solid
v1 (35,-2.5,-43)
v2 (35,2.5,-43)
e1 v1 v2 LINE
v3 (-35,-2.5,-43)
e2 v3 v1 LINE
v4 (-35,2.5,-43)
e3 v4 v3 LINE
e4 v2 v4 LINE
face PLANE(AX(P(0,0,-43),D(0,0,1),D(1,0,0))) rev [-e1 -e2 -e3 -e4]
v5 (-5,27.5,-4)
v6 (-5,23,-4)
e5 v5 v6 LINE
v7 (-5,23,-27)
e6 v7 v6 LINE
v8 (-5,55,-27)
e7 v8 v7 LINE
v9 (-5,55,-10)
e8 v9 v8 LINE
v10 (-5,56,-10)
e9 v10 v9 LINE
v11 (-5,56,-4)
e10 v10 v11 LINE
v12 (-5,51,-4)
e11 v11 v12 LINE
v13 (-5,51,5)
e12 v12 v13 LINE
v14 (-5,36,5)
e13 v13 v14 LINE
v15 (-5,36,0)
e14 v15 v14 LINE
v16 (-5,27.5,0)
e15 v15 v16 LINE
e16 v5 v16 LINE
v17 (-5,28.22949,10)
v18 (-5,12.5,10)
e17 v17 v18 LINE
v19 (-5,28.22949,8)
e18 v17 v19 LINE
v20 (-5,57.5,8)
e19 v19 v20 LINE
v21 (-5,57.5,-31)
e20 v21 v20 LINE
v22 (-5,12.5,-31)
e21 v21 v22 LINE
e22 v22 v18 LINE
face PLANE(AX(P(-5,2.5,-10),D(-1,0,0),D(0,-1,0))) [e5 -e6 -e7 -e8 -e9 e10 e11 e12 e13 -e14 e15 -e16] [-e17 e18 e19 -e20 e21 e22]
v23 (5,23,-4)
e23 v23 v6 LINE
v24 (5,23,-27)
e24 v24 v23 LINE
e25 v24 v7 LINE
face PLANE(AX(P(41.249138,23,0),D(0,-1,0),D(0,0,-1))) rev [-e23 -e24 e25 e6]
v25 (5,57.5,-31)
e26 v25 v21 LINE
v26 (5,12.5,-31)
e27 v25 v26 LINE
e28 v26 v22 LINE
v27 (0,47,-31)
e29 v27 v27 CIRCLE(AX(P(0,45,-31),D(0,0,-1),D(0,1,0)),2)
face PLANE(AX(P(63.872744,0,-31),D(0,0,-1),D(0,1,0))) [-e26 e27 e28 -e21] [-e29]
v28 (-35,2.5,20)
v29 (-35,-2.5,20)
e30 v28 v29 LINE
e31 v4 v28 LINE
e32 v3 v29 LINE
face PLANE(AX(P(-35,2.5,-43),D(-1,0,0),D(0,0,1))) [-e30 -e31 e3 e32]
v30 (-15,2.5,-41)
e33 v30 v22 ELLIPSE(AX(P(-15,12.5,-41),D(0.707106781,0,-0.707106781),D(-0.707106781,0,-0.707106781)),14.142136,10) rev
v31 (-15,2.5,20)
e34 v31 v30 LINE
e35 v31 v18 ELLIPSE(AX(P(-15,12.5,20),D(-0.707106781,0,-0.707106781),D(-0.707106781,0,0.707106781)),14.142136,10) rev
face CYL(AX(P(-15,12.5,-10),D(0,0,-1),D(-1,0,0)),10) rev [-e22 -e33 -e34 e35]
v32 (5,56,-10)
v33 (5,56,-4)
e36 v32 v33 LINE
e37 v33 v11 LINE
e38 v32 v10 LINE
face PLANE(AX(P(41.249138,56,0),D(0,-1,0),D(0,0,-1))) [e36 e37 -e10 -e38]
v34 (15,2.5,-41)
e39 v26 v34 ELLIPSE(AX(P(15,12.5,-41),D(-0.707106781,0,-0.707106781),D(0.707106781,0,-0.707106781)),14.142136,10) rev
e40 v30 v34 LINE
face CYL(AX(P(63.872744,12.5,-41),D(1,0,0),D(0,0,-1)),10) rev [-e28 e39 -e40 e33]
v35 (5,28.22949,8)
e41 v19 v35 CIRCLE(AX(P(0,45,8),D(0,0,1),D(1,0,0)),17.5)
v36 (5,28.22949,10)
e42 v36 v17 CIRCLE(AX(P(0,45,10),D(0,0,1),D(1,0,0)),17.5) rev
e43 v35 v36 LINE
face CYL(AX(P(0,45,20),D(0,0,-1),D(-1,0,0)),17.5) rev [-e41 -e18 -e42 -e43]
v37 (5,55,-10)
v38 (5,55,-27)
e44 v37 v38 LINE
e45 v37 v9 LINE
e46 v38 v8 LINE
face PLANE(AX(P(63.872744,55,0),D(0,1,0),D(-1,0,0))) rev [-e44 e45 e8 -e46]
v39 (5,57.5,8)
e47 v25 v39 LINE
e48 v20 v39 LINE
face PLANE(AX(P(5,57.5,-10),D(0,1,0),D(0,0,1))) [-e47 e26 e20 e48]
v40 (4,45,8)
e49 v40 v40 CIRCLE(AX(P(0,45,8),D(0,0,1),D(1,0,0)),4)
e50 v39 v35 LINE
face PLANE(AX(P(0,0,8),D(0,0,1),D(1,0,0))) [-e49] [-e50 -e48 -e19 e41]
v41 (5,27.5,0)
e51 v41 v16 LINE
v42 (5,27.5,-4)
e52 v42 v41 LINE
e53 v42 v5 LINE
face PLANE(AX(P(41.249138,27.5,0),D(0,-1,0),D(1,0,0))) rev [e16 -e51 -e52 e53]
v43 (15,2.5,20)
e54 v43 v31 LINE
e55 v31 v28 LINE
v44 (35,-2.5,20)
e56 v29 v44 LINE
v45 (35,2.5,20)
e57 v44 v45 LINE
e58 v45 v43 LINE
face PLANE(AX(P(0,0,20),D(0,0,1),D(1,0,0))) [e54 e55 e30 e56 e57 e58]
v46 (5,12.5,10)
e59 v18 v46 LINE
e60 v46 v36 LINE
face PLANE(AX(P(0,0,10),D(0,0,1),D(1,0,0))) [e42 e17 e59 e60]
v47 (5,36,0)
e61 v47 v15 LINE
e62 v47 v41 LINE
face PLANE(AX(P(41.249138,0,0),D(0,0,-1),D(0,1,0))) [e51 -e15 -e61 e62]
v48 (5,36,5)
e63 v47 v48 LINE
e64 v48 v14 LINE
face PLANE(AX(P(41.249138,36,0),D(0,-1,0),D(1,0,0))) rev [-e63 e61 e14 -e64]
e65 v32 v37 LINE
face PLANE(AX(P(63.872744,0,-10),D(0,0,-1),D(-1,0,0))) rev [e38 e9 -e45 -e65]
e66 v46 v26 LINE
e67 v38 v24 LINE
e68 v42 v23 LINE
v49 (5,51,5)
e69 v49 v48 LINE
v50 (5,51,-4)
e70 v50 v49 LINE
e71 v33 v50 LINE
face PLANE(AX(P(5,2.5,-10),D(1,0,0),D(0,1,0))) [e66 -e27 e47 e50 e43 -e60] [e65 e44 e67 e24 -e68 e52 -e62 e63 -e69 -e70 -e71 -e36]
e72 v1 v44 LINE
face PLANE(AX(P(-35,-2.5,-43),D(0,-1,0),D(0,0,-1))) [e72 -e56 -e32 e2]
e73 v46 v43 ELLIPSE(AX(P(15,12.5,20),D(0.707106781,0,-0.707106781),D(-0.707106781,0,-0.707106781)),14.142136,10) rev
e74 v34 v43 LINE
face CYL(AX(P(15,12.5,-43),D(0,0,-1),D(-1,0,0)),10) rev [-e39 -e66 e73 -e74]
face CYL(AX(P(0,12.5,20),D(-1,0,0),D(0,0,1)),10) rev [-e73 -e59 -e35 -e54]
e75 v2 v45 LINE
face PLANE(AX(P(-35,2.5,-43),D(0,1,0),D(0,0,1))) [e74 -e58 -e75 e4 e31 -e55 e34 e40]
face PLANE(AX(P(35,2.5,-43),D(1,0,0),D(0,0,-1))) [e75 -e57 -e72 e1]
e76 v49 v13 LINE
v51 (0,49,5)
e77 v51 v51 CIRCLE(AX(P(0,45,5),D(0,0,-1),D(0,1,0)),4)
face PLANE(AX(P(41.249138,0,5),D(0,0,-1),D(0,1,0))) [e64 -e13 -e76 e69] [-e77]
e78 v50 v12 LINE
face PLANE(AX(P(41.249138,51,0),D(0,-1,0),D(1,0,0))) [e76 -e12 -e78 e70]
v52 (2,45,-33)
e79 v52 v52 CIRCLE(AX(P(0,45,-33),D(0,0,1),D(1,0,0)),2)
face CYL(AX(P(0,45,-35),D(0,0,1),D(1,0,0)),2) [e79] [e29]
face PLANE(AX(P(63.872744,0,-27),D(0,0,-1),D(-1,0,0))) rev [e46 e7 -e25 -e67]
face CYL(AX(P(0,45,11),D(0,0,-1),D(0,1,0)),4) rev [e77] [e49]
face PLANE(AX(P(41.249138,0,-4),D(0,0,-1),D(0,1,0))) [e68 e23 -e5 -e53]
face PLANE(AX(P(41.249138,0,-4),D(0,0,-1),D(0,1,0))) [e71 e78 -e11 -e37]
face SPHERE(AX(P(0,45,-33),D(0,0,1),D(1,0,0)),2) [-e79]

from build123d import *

# Parameters (mm, degrees)
BOSS_EXTRUDE1_DEPTH      = 20
BOSS_EXTRUDE1_DEPTH_BACK = 43
SKETCH1_W                = 70
SKETCH1_H                = 5
BOSS_EXTRUDE2_DEPTH      = 10
BOSS_EXTRUDE2_DEPTH_BACK = 10
SKETCH2_W                = 10
SKETCH2_H                = 55
CUT_EXTRUDE2_DEPTH       = 10
CUT_EXTRUDE2_DEPTH_BACK  = 2
SKETCH4_R                = 1.25
SKETCH5_R                = 1.25
CUT_EXTRUDE3_DEPTH       = 20
CUT_EXTRUDE4_REACH       = 84.19
SKETCH6_W                = 3
SKETCH6_H                = 6
SKETCH6_H_2              = 17.5
SKETCH6_W_2              = 4
SKETCH6_H_3              = 5
SKETCH6_H_4              = 4.5
SKETCH6_W_3              = 5
SKETCH6_H_5              = 9
SKETCH6_W_4              = 13
SKETCH7_R                = 4
CUT_EXTRUDE5_DEPTH       = 6
SKETCH8_W                = 4
SKETCH8_H                = 15
SKETCH8_W_2              = 17
SKETCH8_H_2              = 20.5
BOSS_EXTRUDE3_DEPTH      = 10
SKETCH9_R                = 2
BOSS_EXTRUDE4_DEPTH      = 8
FILLET2_R                = 2
FILLET1_R                = 10


with BuildPart() as part:
    # Sketch1 → Boss-Extrude1 (new, two sides: drawn at the far end of the back side and taken through both)
    with BuildSketch(Plane.XY.offset(-BOSS_EXTRUDE1_DEPTH_BACK)):
        Rectangle(SKETCH1_W, SKETCH1_H)
    extrude(amount=BOSS_EXTRUDE1_DEPTH + BOSS_EXTRUDE1_DEPTH_BACK)

    # Sketch2 → Boss-Extrude2 (add, two sides: drawn at the far end of the back side and taken through both)
    with BuildSketch(Plane.XY.offset(-BOSS_EXTRUDE2_DEPTH_BACK)):
        with Locations((0, 30)):
            Rectangle(SKETCH2_W, SKETCH2_H)
    extrude(amount=BOSS_EXTRUDE2_DEPTH + BOSS_EXTRUDE2_DEPTH_BACK)

    # Sketch4 → Cut-Extrude2 (cut, two sides: drawn at the far end of the back side and taken through both)
    # profile 1 of 2: a face of its own
    with BuildSketch(Plane.XY.offset(10).offset(-CUT_EXTRUDE2_DEPTH_BACK)):
        with BuildLine():
            ThreePointArc((5, 28.229490169), (14.0312152, 34.541749668), (17.5, 45))
            ThreePointArc((17.5, 45), (-10.458250332, 59.0312152), (-5, 28.229490169))
            Line((-5, 28.229490169), (-5, 57.5))
            Line((-5, 57.5), (5, 57.5))
            Line((5, 57.5), (5, 28.229490169))
        make_face()
    # profile 2 of 2: a face of its own
    with BuildSketch(Plane.XY.offset(10).offset(-CUT_EXTRUDE2_DEPTH_BACK)):
        with BuildLine():
            Line((-5, 57.5), (-5, 28.229490169))
            ThreePointArc((-5, 28.229490169), (0, 27.5), (5, 28.229490169))
            Line((5, 28.229490169), (5, 57.5))
            Line((5, 57.5), (-5, 57.5))
        make_face()
        with Locations((0, 45)):
            Circle(SKETCH4_R, mode=Mode.SUBTRACT)
    extrude(amount=CUT_EXTRUDE2_DEPTH + CUT_EXTRUDE2_DEPTH_BACK, mode=Mode.SUBTRACT)

    # Sketch5 → Cut-Extrude3 (cut)
    with BuildSketch(Plane.XY.offset(10)):
        with Locations((0, 45)):
            Circle(SKETCH5_R)
    extrude(amount=-CUT_EXTRUDE3_DEPTH, mode=Mode.SUBTRACT)

    # Cut-Extrude4: up to this face of the body (flat: up to its plane)
    cut_extrude4_end = Plane(part.part.faces().sort_by_distance((5, 29.276865139, -0.505895275))[0])
    # Sketch6 → Cut-Extrude4 (cut, up to the picked face)
    with BuildSketch(Plane.ZY.offset(5), mode=Mode.PRIVATE) as cut_extrude4_sk1:
        with Locations((-5.5, 48)):
            Rectangle(SKETCH6_W, SKETCH6_H)
    cut_extrude4_tool1 = split(extrude(cut_extrude4_sk1.sketch, amount=-CUT_EXTRUDE4_REACH, mode=Mode.PRIVATE), bisect_by=cut_extrude4_end, keep=Keep.BOTH, mode=Mode.PRIVATE)
    # Sketch6 → Cut-Extrude4 (cut, up to the picked face)
    with BuildSketch(Plane.ZY.offset(5), mode=Mode.PRIVATE) as cut_extrude4_sk2:
        Polygon((-7, 27.5), (-7, 45), (-7, 51), (-23, 51), (-23, 27.5), (-10, 27.5), align=None)
    cut_extrude4_tool2 = split(extrude(cut_extrude4_sk2.sketch, amount=-CUT_EXTRUDE4_REACH, mode=Mode.PRIVATE), bisect_by=cut_extrude4_end, keep=Keep.BOTH, mode=Mode.PRIVATE)
    # Sketch6 → Cut-Extrude4 (cut, up to the picked face)
    with BuildSketch(Plane.ZY.offset(5), mode=Mode.PRIVATE) as cut_extrude4_sk3:
        with Locations((-5.5, 36.25)):
            Rectangle(SKETCH6_W, SKETCH6_H_2)
    cut_extrude4_tool3 = split(extrude(cut_extrude4_sk3.sketch, amount=-CUT_EXTRUDE4_REACH, mode=Mode.PRIVATE), bisect_by=cut_extrude4_end, keep=Keep.BOTH, mode=Mode.PRIVATE)
    # Sketch6 → Cut-Extrude4 (cut, up to the picked face)
    with BuildSketch(Plane.ZY.offset(5), mode=Mode.PRIVATE) as cut_extrude4_sk4:
        with Locations((-2, 48)):
            Rectangle(SKETCH6_W_2, SKETCH6_H)
    cut_extrude4_tool4 = split(extrude(cut_extrude4_sk4.sketch, amount=-CUT_EXTRUDE4_REACH, mode=Mode.PRIVATE), bisect_by=cut_extrude4_end, keep=Keep.BOTH, mode=Mode.PRIVATE)
    # Sketch6 → Cut-Extrude4 (cut, up to the picked face)
    with BuildSketch(Plane.ZY.offset(5), mode=Mode.PRIVATE) as cut_extrude4_sk5:
        Polygon((0, 45), (-4, 45), (-4, 27.5), (0, 27.5), (0, 36), align=None)
    cut_extrude4_tool5 = split(extrude(cut_extrude4_sk5.sketch, amount=-CUT_EXTRUDE4_REACH, mode=Mode.PRIVATE), bisect_by=cut_extrude4_end, keep=Keep.BOTH, mode=Mode.PRIVATE)
    # Sketch6 → Cut-Extrude4 (cut, up to the picked face)
    with BuildSketch(Plane.ZY.offset(5), mode=Mode.PRIVATE) as cut_extrude4_sk6:
        with Locations((-5.5, 53.5)):
            Rectangle(SKETCH6_W, SKETCH6_H_3)
    cut_extrude4_tool6 = split(extrude(cut_extrude4_sk6.sketch, amount=-CUT_EXTRUDE4_REACH, mode=Mode.PRIVATE), bisect_by=cut_extrude4_end, keep=Keep.BOTH, mode=Mode.PRIVATE)
    # Sketch6 → Cut-Extrude4 (cut, up to the picked face)
    with BuildSketch(Plane.ZY.offset(5), mode=Mode.PRIVATE) as cut_extrude4_sk7:
        Polygon((-23, 51), (-7, 51), (-7, 56), (-10, 56), (-23, 56), align=None)
    cut_extrude4_tool7 = split(extrude(cut_extrude4_sk7.sketch, amount=-CUT_EXTRUDE4_REACH, mode=Mode.PRIVATE), bisect_by=cut_extrude4_end, keep=Keep.BOTH, mode=Mode.PRIVATE)
    # Sketch6 → Cut-Extrude4 (cut, up to the picked face)
    with BuildSketch(Plane.ZY.offset(5), mode=Mode.PRIVATE) as cut_extrude4_sk8:
        with Locations((-8.5, 25.25)):
            Rectangle(SKETCH6_W, SKETCH6_H_4)
    cut_extrude4_tool8 = split(extrude(cut_extrude4_sk8.sketch, amount=-CUT_EXTRUDE4_REACH, mode=Mode.PRIVATE), bisect_by=cut_extrude4_end, keep=Keep.BOTH, mode=Mode.PRIVATE)
    # Sketch6 → Cut-Extrude4 (cut, up to the picked face)
    with BuildSketch(Plane.ZY.offset(5), mode=Mode.PRIVATE) as cut_extrude4_sk9:
        with Locations((-5.5, 25.25)):
            Rectangle(SKETCH6_W, SKETCH6_H_4)
    cut_extrude4_tool9 = split(extrude(cut_extrude4_sk9.sketch, amount=-CUT_EXTRUDE4_REACH, mode=Mode.PRIVATE), bisect_by=cut_extrude4_end, keep=Keep.BOTH, mode=Mode.PRIVATE)
    # Sketch6 → Cut-Extrude4 (cut, up to the picked face)
    with BuildSketch(Plane.ZY.offset(5), mode=Mode.PRIVATE) as cut_extrude4_sk10:
        with Locations((2.5, 48)):
            Rectangle(SKETCH6_W_3, SKETCH6_H)
    cut_extrude4_tool10 = split(extrude(cut_extrude4_sk10.sketch, amount=-CUT_EXTRUDE4_REACH, mode=Mode.PRIVATE), bisect_by=cut_extrude4_end, keep=Keep.BOTH, mode=Mode.PRIVATE)
    # Sketch6 → Cut-Extrude4 (cut, up to the picked face)
    with BuildSketch(Plane.ZY.offset(5), mode=Mode.PRIVATE) as cut_extrude4_sk11:
        with Locations((2.5, 40.5)):
            Rectangle(SKETCH6_W_3, SKETCH6_H_5)
    cut_extrude4_tool11 = split(extrude(cut_extrude4_sk11.sketch, amount=-CUT_EXTRUDE4_REACH, mode=Mode.PRIVATE), bisect_by=cut_extrude4_end, keep=Keep.BOTH, mode=Mode.PRIVATE)
    # Sketch6 → Cut-Extrude4 (cut, up to the picked face)
    with BuildSketch(Plane.ZY.offset(5), mode=Mode.PRIVATE) as cut_extrude4_sk12:
        with Locations((-16.5, 25.25)):
            Rectangle(SKETCH6_W_4, SKETCH6_H_4)
    cut_extrude4_tool12 = split(extrude(cut_extrude4_sk12.sketch, amount=-CUT_EXTRUDE4_REACH, mode=Mode.PRIVATE), bisect_by=cut_extrude4_end, keep=Keep.BOTH, mode=Mode.PRIVATE)
    add(cut_extrude4_tool1.solids().sort_by(Axis((-5, 48, -5.5), (1, 0, 0)))[0], mode=Mode.SUBTRACT)
    add(cut_extrude4_tool2.solids().sort_by(Axis((-5, 39.25, -15), (1, 0, 0)))[0], mode=Mode.SUBTRACT)
    add(cut_extrude4_tool3.solids().sort_by(Axis((-5, 36.25, -5.5), (1, 0, 0)))[0], mode=Mode.SUBTRACT)
    add(cut_extrude4_tool4.solids().sort_by(Axis((-5, 48, -2), (1, 0, 0)))[0], mode=Mode.SUBTRACT)
    add(cut_extrude4_tool5.solids().sort_by(Axis((-5, 36.25, -2), (1, 0, 0)))[0], mode=Mode.SUBTRACT)
    add(cut_extrude4_tool6.solids().sort_by(Axis((-5, 53.5, -5.5), (1, 0, 0)))[0], mode=Mode.SUBTRACT)
    add(cut_extrude4_tool7.solids().sort_by(Axis((-5, 53.5, -15), (1, 0, 0)))[0], mode=Mode.SUBTRACT)
    add(cut_extrude4_tool8.solids().sort_by(Axis((-5, 25.25, -8.5), (1, 0, 0)))[0], mode=Mode.SUBTRACT)
    add(cut_extrude4_tool9.solids().sort_by(Axis((-5, 25.25, -5.5), (1, 0, 0)))[0], mode=Mode.SUBTRACT)
    add(cut_extrude4_tool10.solids().sort_by(Axis((-5, 48, 2.5), (1, 0, 0)))[0], mode=Mode.SUBTRACT)
    add(cut_extrude4_tool11.solids().sort_by(Axis((-5, 40.5, 2.5), (1, 0, 0)))[0], mode=Mode.SUBTRACT)
    add(cut_extrude4_tool12.solids().sort_by(Axis((-5, 25.25, -16.5), (1, 0, 0)))[0], mode=Mode.SUBTRACT)

    # Sketch7 → Cut-Extrude5 (cut)
    with BuildSketch(Plane(origin=(0, 0, 5), x_dir=(-1, 0, 0), z_dir=(0, 0, -1))):
        with Locations(Location((0, 45, 0), (0, 0, 90))):
            Circle(SKETCH7_R)
    extrude(amount=-CUT_EXTRUDE5_DEPTH, mode=Mode.SUBTRACT)

    # Sketch8 → Boss-Extrude3 (add)
    with BuildSketch(Plane.ZY.offset(5)):
        Polygon((-10, 55), (-10, 57.5), (-31, 57.5), (-31, 55), (-27, 55), align=None)
        with Locations((-29, 47.5)):
            Rectangle(SKETCH8_W, SKETCH8_H)
        Polygon((-27, 40), (-31, 40), (-31, 2.5), (-27, 2.5), (-27, 23), align=None)
        with Locations((-18.5, 12.75)):
            Rectangle(SKETCH8_W_2, SKETCH8_H_2)
    extrude(amount=-BOSS_EXTRUDE3_DEPTH)

    # Sketch9 → Boss-Extrude4 (add)
    with BuildSketch(Plane.XY.offset(-27)):
        with Locations((0, 45)):
            Circle(SKETCH9_R)
    extrude(amount=-BOSS_EXTRUDE4_DEPTH)

    # Fillet2
    fillet2_edges = [part.edges().sort_by_distance(p)[0] for p in [
        (-2, 45, -35),
    ]]
    fillet(fillet2_edges, radius=FILLET2_R)

    # Fillet1
    fillet1_edges = [part.edges().sort_by_distance(p)[0] for p in [
        (0, 2.5, -31),
        (5, 2.5, -10.5),
        (-5, 2.5, -10.5),
        (0, 2.5, 10),
    ]]
    fillet(fillet1_edges, radius=FILLET1_R - 0.0001)  # a hair under: the kernel refuses the full size


solid = part.part
